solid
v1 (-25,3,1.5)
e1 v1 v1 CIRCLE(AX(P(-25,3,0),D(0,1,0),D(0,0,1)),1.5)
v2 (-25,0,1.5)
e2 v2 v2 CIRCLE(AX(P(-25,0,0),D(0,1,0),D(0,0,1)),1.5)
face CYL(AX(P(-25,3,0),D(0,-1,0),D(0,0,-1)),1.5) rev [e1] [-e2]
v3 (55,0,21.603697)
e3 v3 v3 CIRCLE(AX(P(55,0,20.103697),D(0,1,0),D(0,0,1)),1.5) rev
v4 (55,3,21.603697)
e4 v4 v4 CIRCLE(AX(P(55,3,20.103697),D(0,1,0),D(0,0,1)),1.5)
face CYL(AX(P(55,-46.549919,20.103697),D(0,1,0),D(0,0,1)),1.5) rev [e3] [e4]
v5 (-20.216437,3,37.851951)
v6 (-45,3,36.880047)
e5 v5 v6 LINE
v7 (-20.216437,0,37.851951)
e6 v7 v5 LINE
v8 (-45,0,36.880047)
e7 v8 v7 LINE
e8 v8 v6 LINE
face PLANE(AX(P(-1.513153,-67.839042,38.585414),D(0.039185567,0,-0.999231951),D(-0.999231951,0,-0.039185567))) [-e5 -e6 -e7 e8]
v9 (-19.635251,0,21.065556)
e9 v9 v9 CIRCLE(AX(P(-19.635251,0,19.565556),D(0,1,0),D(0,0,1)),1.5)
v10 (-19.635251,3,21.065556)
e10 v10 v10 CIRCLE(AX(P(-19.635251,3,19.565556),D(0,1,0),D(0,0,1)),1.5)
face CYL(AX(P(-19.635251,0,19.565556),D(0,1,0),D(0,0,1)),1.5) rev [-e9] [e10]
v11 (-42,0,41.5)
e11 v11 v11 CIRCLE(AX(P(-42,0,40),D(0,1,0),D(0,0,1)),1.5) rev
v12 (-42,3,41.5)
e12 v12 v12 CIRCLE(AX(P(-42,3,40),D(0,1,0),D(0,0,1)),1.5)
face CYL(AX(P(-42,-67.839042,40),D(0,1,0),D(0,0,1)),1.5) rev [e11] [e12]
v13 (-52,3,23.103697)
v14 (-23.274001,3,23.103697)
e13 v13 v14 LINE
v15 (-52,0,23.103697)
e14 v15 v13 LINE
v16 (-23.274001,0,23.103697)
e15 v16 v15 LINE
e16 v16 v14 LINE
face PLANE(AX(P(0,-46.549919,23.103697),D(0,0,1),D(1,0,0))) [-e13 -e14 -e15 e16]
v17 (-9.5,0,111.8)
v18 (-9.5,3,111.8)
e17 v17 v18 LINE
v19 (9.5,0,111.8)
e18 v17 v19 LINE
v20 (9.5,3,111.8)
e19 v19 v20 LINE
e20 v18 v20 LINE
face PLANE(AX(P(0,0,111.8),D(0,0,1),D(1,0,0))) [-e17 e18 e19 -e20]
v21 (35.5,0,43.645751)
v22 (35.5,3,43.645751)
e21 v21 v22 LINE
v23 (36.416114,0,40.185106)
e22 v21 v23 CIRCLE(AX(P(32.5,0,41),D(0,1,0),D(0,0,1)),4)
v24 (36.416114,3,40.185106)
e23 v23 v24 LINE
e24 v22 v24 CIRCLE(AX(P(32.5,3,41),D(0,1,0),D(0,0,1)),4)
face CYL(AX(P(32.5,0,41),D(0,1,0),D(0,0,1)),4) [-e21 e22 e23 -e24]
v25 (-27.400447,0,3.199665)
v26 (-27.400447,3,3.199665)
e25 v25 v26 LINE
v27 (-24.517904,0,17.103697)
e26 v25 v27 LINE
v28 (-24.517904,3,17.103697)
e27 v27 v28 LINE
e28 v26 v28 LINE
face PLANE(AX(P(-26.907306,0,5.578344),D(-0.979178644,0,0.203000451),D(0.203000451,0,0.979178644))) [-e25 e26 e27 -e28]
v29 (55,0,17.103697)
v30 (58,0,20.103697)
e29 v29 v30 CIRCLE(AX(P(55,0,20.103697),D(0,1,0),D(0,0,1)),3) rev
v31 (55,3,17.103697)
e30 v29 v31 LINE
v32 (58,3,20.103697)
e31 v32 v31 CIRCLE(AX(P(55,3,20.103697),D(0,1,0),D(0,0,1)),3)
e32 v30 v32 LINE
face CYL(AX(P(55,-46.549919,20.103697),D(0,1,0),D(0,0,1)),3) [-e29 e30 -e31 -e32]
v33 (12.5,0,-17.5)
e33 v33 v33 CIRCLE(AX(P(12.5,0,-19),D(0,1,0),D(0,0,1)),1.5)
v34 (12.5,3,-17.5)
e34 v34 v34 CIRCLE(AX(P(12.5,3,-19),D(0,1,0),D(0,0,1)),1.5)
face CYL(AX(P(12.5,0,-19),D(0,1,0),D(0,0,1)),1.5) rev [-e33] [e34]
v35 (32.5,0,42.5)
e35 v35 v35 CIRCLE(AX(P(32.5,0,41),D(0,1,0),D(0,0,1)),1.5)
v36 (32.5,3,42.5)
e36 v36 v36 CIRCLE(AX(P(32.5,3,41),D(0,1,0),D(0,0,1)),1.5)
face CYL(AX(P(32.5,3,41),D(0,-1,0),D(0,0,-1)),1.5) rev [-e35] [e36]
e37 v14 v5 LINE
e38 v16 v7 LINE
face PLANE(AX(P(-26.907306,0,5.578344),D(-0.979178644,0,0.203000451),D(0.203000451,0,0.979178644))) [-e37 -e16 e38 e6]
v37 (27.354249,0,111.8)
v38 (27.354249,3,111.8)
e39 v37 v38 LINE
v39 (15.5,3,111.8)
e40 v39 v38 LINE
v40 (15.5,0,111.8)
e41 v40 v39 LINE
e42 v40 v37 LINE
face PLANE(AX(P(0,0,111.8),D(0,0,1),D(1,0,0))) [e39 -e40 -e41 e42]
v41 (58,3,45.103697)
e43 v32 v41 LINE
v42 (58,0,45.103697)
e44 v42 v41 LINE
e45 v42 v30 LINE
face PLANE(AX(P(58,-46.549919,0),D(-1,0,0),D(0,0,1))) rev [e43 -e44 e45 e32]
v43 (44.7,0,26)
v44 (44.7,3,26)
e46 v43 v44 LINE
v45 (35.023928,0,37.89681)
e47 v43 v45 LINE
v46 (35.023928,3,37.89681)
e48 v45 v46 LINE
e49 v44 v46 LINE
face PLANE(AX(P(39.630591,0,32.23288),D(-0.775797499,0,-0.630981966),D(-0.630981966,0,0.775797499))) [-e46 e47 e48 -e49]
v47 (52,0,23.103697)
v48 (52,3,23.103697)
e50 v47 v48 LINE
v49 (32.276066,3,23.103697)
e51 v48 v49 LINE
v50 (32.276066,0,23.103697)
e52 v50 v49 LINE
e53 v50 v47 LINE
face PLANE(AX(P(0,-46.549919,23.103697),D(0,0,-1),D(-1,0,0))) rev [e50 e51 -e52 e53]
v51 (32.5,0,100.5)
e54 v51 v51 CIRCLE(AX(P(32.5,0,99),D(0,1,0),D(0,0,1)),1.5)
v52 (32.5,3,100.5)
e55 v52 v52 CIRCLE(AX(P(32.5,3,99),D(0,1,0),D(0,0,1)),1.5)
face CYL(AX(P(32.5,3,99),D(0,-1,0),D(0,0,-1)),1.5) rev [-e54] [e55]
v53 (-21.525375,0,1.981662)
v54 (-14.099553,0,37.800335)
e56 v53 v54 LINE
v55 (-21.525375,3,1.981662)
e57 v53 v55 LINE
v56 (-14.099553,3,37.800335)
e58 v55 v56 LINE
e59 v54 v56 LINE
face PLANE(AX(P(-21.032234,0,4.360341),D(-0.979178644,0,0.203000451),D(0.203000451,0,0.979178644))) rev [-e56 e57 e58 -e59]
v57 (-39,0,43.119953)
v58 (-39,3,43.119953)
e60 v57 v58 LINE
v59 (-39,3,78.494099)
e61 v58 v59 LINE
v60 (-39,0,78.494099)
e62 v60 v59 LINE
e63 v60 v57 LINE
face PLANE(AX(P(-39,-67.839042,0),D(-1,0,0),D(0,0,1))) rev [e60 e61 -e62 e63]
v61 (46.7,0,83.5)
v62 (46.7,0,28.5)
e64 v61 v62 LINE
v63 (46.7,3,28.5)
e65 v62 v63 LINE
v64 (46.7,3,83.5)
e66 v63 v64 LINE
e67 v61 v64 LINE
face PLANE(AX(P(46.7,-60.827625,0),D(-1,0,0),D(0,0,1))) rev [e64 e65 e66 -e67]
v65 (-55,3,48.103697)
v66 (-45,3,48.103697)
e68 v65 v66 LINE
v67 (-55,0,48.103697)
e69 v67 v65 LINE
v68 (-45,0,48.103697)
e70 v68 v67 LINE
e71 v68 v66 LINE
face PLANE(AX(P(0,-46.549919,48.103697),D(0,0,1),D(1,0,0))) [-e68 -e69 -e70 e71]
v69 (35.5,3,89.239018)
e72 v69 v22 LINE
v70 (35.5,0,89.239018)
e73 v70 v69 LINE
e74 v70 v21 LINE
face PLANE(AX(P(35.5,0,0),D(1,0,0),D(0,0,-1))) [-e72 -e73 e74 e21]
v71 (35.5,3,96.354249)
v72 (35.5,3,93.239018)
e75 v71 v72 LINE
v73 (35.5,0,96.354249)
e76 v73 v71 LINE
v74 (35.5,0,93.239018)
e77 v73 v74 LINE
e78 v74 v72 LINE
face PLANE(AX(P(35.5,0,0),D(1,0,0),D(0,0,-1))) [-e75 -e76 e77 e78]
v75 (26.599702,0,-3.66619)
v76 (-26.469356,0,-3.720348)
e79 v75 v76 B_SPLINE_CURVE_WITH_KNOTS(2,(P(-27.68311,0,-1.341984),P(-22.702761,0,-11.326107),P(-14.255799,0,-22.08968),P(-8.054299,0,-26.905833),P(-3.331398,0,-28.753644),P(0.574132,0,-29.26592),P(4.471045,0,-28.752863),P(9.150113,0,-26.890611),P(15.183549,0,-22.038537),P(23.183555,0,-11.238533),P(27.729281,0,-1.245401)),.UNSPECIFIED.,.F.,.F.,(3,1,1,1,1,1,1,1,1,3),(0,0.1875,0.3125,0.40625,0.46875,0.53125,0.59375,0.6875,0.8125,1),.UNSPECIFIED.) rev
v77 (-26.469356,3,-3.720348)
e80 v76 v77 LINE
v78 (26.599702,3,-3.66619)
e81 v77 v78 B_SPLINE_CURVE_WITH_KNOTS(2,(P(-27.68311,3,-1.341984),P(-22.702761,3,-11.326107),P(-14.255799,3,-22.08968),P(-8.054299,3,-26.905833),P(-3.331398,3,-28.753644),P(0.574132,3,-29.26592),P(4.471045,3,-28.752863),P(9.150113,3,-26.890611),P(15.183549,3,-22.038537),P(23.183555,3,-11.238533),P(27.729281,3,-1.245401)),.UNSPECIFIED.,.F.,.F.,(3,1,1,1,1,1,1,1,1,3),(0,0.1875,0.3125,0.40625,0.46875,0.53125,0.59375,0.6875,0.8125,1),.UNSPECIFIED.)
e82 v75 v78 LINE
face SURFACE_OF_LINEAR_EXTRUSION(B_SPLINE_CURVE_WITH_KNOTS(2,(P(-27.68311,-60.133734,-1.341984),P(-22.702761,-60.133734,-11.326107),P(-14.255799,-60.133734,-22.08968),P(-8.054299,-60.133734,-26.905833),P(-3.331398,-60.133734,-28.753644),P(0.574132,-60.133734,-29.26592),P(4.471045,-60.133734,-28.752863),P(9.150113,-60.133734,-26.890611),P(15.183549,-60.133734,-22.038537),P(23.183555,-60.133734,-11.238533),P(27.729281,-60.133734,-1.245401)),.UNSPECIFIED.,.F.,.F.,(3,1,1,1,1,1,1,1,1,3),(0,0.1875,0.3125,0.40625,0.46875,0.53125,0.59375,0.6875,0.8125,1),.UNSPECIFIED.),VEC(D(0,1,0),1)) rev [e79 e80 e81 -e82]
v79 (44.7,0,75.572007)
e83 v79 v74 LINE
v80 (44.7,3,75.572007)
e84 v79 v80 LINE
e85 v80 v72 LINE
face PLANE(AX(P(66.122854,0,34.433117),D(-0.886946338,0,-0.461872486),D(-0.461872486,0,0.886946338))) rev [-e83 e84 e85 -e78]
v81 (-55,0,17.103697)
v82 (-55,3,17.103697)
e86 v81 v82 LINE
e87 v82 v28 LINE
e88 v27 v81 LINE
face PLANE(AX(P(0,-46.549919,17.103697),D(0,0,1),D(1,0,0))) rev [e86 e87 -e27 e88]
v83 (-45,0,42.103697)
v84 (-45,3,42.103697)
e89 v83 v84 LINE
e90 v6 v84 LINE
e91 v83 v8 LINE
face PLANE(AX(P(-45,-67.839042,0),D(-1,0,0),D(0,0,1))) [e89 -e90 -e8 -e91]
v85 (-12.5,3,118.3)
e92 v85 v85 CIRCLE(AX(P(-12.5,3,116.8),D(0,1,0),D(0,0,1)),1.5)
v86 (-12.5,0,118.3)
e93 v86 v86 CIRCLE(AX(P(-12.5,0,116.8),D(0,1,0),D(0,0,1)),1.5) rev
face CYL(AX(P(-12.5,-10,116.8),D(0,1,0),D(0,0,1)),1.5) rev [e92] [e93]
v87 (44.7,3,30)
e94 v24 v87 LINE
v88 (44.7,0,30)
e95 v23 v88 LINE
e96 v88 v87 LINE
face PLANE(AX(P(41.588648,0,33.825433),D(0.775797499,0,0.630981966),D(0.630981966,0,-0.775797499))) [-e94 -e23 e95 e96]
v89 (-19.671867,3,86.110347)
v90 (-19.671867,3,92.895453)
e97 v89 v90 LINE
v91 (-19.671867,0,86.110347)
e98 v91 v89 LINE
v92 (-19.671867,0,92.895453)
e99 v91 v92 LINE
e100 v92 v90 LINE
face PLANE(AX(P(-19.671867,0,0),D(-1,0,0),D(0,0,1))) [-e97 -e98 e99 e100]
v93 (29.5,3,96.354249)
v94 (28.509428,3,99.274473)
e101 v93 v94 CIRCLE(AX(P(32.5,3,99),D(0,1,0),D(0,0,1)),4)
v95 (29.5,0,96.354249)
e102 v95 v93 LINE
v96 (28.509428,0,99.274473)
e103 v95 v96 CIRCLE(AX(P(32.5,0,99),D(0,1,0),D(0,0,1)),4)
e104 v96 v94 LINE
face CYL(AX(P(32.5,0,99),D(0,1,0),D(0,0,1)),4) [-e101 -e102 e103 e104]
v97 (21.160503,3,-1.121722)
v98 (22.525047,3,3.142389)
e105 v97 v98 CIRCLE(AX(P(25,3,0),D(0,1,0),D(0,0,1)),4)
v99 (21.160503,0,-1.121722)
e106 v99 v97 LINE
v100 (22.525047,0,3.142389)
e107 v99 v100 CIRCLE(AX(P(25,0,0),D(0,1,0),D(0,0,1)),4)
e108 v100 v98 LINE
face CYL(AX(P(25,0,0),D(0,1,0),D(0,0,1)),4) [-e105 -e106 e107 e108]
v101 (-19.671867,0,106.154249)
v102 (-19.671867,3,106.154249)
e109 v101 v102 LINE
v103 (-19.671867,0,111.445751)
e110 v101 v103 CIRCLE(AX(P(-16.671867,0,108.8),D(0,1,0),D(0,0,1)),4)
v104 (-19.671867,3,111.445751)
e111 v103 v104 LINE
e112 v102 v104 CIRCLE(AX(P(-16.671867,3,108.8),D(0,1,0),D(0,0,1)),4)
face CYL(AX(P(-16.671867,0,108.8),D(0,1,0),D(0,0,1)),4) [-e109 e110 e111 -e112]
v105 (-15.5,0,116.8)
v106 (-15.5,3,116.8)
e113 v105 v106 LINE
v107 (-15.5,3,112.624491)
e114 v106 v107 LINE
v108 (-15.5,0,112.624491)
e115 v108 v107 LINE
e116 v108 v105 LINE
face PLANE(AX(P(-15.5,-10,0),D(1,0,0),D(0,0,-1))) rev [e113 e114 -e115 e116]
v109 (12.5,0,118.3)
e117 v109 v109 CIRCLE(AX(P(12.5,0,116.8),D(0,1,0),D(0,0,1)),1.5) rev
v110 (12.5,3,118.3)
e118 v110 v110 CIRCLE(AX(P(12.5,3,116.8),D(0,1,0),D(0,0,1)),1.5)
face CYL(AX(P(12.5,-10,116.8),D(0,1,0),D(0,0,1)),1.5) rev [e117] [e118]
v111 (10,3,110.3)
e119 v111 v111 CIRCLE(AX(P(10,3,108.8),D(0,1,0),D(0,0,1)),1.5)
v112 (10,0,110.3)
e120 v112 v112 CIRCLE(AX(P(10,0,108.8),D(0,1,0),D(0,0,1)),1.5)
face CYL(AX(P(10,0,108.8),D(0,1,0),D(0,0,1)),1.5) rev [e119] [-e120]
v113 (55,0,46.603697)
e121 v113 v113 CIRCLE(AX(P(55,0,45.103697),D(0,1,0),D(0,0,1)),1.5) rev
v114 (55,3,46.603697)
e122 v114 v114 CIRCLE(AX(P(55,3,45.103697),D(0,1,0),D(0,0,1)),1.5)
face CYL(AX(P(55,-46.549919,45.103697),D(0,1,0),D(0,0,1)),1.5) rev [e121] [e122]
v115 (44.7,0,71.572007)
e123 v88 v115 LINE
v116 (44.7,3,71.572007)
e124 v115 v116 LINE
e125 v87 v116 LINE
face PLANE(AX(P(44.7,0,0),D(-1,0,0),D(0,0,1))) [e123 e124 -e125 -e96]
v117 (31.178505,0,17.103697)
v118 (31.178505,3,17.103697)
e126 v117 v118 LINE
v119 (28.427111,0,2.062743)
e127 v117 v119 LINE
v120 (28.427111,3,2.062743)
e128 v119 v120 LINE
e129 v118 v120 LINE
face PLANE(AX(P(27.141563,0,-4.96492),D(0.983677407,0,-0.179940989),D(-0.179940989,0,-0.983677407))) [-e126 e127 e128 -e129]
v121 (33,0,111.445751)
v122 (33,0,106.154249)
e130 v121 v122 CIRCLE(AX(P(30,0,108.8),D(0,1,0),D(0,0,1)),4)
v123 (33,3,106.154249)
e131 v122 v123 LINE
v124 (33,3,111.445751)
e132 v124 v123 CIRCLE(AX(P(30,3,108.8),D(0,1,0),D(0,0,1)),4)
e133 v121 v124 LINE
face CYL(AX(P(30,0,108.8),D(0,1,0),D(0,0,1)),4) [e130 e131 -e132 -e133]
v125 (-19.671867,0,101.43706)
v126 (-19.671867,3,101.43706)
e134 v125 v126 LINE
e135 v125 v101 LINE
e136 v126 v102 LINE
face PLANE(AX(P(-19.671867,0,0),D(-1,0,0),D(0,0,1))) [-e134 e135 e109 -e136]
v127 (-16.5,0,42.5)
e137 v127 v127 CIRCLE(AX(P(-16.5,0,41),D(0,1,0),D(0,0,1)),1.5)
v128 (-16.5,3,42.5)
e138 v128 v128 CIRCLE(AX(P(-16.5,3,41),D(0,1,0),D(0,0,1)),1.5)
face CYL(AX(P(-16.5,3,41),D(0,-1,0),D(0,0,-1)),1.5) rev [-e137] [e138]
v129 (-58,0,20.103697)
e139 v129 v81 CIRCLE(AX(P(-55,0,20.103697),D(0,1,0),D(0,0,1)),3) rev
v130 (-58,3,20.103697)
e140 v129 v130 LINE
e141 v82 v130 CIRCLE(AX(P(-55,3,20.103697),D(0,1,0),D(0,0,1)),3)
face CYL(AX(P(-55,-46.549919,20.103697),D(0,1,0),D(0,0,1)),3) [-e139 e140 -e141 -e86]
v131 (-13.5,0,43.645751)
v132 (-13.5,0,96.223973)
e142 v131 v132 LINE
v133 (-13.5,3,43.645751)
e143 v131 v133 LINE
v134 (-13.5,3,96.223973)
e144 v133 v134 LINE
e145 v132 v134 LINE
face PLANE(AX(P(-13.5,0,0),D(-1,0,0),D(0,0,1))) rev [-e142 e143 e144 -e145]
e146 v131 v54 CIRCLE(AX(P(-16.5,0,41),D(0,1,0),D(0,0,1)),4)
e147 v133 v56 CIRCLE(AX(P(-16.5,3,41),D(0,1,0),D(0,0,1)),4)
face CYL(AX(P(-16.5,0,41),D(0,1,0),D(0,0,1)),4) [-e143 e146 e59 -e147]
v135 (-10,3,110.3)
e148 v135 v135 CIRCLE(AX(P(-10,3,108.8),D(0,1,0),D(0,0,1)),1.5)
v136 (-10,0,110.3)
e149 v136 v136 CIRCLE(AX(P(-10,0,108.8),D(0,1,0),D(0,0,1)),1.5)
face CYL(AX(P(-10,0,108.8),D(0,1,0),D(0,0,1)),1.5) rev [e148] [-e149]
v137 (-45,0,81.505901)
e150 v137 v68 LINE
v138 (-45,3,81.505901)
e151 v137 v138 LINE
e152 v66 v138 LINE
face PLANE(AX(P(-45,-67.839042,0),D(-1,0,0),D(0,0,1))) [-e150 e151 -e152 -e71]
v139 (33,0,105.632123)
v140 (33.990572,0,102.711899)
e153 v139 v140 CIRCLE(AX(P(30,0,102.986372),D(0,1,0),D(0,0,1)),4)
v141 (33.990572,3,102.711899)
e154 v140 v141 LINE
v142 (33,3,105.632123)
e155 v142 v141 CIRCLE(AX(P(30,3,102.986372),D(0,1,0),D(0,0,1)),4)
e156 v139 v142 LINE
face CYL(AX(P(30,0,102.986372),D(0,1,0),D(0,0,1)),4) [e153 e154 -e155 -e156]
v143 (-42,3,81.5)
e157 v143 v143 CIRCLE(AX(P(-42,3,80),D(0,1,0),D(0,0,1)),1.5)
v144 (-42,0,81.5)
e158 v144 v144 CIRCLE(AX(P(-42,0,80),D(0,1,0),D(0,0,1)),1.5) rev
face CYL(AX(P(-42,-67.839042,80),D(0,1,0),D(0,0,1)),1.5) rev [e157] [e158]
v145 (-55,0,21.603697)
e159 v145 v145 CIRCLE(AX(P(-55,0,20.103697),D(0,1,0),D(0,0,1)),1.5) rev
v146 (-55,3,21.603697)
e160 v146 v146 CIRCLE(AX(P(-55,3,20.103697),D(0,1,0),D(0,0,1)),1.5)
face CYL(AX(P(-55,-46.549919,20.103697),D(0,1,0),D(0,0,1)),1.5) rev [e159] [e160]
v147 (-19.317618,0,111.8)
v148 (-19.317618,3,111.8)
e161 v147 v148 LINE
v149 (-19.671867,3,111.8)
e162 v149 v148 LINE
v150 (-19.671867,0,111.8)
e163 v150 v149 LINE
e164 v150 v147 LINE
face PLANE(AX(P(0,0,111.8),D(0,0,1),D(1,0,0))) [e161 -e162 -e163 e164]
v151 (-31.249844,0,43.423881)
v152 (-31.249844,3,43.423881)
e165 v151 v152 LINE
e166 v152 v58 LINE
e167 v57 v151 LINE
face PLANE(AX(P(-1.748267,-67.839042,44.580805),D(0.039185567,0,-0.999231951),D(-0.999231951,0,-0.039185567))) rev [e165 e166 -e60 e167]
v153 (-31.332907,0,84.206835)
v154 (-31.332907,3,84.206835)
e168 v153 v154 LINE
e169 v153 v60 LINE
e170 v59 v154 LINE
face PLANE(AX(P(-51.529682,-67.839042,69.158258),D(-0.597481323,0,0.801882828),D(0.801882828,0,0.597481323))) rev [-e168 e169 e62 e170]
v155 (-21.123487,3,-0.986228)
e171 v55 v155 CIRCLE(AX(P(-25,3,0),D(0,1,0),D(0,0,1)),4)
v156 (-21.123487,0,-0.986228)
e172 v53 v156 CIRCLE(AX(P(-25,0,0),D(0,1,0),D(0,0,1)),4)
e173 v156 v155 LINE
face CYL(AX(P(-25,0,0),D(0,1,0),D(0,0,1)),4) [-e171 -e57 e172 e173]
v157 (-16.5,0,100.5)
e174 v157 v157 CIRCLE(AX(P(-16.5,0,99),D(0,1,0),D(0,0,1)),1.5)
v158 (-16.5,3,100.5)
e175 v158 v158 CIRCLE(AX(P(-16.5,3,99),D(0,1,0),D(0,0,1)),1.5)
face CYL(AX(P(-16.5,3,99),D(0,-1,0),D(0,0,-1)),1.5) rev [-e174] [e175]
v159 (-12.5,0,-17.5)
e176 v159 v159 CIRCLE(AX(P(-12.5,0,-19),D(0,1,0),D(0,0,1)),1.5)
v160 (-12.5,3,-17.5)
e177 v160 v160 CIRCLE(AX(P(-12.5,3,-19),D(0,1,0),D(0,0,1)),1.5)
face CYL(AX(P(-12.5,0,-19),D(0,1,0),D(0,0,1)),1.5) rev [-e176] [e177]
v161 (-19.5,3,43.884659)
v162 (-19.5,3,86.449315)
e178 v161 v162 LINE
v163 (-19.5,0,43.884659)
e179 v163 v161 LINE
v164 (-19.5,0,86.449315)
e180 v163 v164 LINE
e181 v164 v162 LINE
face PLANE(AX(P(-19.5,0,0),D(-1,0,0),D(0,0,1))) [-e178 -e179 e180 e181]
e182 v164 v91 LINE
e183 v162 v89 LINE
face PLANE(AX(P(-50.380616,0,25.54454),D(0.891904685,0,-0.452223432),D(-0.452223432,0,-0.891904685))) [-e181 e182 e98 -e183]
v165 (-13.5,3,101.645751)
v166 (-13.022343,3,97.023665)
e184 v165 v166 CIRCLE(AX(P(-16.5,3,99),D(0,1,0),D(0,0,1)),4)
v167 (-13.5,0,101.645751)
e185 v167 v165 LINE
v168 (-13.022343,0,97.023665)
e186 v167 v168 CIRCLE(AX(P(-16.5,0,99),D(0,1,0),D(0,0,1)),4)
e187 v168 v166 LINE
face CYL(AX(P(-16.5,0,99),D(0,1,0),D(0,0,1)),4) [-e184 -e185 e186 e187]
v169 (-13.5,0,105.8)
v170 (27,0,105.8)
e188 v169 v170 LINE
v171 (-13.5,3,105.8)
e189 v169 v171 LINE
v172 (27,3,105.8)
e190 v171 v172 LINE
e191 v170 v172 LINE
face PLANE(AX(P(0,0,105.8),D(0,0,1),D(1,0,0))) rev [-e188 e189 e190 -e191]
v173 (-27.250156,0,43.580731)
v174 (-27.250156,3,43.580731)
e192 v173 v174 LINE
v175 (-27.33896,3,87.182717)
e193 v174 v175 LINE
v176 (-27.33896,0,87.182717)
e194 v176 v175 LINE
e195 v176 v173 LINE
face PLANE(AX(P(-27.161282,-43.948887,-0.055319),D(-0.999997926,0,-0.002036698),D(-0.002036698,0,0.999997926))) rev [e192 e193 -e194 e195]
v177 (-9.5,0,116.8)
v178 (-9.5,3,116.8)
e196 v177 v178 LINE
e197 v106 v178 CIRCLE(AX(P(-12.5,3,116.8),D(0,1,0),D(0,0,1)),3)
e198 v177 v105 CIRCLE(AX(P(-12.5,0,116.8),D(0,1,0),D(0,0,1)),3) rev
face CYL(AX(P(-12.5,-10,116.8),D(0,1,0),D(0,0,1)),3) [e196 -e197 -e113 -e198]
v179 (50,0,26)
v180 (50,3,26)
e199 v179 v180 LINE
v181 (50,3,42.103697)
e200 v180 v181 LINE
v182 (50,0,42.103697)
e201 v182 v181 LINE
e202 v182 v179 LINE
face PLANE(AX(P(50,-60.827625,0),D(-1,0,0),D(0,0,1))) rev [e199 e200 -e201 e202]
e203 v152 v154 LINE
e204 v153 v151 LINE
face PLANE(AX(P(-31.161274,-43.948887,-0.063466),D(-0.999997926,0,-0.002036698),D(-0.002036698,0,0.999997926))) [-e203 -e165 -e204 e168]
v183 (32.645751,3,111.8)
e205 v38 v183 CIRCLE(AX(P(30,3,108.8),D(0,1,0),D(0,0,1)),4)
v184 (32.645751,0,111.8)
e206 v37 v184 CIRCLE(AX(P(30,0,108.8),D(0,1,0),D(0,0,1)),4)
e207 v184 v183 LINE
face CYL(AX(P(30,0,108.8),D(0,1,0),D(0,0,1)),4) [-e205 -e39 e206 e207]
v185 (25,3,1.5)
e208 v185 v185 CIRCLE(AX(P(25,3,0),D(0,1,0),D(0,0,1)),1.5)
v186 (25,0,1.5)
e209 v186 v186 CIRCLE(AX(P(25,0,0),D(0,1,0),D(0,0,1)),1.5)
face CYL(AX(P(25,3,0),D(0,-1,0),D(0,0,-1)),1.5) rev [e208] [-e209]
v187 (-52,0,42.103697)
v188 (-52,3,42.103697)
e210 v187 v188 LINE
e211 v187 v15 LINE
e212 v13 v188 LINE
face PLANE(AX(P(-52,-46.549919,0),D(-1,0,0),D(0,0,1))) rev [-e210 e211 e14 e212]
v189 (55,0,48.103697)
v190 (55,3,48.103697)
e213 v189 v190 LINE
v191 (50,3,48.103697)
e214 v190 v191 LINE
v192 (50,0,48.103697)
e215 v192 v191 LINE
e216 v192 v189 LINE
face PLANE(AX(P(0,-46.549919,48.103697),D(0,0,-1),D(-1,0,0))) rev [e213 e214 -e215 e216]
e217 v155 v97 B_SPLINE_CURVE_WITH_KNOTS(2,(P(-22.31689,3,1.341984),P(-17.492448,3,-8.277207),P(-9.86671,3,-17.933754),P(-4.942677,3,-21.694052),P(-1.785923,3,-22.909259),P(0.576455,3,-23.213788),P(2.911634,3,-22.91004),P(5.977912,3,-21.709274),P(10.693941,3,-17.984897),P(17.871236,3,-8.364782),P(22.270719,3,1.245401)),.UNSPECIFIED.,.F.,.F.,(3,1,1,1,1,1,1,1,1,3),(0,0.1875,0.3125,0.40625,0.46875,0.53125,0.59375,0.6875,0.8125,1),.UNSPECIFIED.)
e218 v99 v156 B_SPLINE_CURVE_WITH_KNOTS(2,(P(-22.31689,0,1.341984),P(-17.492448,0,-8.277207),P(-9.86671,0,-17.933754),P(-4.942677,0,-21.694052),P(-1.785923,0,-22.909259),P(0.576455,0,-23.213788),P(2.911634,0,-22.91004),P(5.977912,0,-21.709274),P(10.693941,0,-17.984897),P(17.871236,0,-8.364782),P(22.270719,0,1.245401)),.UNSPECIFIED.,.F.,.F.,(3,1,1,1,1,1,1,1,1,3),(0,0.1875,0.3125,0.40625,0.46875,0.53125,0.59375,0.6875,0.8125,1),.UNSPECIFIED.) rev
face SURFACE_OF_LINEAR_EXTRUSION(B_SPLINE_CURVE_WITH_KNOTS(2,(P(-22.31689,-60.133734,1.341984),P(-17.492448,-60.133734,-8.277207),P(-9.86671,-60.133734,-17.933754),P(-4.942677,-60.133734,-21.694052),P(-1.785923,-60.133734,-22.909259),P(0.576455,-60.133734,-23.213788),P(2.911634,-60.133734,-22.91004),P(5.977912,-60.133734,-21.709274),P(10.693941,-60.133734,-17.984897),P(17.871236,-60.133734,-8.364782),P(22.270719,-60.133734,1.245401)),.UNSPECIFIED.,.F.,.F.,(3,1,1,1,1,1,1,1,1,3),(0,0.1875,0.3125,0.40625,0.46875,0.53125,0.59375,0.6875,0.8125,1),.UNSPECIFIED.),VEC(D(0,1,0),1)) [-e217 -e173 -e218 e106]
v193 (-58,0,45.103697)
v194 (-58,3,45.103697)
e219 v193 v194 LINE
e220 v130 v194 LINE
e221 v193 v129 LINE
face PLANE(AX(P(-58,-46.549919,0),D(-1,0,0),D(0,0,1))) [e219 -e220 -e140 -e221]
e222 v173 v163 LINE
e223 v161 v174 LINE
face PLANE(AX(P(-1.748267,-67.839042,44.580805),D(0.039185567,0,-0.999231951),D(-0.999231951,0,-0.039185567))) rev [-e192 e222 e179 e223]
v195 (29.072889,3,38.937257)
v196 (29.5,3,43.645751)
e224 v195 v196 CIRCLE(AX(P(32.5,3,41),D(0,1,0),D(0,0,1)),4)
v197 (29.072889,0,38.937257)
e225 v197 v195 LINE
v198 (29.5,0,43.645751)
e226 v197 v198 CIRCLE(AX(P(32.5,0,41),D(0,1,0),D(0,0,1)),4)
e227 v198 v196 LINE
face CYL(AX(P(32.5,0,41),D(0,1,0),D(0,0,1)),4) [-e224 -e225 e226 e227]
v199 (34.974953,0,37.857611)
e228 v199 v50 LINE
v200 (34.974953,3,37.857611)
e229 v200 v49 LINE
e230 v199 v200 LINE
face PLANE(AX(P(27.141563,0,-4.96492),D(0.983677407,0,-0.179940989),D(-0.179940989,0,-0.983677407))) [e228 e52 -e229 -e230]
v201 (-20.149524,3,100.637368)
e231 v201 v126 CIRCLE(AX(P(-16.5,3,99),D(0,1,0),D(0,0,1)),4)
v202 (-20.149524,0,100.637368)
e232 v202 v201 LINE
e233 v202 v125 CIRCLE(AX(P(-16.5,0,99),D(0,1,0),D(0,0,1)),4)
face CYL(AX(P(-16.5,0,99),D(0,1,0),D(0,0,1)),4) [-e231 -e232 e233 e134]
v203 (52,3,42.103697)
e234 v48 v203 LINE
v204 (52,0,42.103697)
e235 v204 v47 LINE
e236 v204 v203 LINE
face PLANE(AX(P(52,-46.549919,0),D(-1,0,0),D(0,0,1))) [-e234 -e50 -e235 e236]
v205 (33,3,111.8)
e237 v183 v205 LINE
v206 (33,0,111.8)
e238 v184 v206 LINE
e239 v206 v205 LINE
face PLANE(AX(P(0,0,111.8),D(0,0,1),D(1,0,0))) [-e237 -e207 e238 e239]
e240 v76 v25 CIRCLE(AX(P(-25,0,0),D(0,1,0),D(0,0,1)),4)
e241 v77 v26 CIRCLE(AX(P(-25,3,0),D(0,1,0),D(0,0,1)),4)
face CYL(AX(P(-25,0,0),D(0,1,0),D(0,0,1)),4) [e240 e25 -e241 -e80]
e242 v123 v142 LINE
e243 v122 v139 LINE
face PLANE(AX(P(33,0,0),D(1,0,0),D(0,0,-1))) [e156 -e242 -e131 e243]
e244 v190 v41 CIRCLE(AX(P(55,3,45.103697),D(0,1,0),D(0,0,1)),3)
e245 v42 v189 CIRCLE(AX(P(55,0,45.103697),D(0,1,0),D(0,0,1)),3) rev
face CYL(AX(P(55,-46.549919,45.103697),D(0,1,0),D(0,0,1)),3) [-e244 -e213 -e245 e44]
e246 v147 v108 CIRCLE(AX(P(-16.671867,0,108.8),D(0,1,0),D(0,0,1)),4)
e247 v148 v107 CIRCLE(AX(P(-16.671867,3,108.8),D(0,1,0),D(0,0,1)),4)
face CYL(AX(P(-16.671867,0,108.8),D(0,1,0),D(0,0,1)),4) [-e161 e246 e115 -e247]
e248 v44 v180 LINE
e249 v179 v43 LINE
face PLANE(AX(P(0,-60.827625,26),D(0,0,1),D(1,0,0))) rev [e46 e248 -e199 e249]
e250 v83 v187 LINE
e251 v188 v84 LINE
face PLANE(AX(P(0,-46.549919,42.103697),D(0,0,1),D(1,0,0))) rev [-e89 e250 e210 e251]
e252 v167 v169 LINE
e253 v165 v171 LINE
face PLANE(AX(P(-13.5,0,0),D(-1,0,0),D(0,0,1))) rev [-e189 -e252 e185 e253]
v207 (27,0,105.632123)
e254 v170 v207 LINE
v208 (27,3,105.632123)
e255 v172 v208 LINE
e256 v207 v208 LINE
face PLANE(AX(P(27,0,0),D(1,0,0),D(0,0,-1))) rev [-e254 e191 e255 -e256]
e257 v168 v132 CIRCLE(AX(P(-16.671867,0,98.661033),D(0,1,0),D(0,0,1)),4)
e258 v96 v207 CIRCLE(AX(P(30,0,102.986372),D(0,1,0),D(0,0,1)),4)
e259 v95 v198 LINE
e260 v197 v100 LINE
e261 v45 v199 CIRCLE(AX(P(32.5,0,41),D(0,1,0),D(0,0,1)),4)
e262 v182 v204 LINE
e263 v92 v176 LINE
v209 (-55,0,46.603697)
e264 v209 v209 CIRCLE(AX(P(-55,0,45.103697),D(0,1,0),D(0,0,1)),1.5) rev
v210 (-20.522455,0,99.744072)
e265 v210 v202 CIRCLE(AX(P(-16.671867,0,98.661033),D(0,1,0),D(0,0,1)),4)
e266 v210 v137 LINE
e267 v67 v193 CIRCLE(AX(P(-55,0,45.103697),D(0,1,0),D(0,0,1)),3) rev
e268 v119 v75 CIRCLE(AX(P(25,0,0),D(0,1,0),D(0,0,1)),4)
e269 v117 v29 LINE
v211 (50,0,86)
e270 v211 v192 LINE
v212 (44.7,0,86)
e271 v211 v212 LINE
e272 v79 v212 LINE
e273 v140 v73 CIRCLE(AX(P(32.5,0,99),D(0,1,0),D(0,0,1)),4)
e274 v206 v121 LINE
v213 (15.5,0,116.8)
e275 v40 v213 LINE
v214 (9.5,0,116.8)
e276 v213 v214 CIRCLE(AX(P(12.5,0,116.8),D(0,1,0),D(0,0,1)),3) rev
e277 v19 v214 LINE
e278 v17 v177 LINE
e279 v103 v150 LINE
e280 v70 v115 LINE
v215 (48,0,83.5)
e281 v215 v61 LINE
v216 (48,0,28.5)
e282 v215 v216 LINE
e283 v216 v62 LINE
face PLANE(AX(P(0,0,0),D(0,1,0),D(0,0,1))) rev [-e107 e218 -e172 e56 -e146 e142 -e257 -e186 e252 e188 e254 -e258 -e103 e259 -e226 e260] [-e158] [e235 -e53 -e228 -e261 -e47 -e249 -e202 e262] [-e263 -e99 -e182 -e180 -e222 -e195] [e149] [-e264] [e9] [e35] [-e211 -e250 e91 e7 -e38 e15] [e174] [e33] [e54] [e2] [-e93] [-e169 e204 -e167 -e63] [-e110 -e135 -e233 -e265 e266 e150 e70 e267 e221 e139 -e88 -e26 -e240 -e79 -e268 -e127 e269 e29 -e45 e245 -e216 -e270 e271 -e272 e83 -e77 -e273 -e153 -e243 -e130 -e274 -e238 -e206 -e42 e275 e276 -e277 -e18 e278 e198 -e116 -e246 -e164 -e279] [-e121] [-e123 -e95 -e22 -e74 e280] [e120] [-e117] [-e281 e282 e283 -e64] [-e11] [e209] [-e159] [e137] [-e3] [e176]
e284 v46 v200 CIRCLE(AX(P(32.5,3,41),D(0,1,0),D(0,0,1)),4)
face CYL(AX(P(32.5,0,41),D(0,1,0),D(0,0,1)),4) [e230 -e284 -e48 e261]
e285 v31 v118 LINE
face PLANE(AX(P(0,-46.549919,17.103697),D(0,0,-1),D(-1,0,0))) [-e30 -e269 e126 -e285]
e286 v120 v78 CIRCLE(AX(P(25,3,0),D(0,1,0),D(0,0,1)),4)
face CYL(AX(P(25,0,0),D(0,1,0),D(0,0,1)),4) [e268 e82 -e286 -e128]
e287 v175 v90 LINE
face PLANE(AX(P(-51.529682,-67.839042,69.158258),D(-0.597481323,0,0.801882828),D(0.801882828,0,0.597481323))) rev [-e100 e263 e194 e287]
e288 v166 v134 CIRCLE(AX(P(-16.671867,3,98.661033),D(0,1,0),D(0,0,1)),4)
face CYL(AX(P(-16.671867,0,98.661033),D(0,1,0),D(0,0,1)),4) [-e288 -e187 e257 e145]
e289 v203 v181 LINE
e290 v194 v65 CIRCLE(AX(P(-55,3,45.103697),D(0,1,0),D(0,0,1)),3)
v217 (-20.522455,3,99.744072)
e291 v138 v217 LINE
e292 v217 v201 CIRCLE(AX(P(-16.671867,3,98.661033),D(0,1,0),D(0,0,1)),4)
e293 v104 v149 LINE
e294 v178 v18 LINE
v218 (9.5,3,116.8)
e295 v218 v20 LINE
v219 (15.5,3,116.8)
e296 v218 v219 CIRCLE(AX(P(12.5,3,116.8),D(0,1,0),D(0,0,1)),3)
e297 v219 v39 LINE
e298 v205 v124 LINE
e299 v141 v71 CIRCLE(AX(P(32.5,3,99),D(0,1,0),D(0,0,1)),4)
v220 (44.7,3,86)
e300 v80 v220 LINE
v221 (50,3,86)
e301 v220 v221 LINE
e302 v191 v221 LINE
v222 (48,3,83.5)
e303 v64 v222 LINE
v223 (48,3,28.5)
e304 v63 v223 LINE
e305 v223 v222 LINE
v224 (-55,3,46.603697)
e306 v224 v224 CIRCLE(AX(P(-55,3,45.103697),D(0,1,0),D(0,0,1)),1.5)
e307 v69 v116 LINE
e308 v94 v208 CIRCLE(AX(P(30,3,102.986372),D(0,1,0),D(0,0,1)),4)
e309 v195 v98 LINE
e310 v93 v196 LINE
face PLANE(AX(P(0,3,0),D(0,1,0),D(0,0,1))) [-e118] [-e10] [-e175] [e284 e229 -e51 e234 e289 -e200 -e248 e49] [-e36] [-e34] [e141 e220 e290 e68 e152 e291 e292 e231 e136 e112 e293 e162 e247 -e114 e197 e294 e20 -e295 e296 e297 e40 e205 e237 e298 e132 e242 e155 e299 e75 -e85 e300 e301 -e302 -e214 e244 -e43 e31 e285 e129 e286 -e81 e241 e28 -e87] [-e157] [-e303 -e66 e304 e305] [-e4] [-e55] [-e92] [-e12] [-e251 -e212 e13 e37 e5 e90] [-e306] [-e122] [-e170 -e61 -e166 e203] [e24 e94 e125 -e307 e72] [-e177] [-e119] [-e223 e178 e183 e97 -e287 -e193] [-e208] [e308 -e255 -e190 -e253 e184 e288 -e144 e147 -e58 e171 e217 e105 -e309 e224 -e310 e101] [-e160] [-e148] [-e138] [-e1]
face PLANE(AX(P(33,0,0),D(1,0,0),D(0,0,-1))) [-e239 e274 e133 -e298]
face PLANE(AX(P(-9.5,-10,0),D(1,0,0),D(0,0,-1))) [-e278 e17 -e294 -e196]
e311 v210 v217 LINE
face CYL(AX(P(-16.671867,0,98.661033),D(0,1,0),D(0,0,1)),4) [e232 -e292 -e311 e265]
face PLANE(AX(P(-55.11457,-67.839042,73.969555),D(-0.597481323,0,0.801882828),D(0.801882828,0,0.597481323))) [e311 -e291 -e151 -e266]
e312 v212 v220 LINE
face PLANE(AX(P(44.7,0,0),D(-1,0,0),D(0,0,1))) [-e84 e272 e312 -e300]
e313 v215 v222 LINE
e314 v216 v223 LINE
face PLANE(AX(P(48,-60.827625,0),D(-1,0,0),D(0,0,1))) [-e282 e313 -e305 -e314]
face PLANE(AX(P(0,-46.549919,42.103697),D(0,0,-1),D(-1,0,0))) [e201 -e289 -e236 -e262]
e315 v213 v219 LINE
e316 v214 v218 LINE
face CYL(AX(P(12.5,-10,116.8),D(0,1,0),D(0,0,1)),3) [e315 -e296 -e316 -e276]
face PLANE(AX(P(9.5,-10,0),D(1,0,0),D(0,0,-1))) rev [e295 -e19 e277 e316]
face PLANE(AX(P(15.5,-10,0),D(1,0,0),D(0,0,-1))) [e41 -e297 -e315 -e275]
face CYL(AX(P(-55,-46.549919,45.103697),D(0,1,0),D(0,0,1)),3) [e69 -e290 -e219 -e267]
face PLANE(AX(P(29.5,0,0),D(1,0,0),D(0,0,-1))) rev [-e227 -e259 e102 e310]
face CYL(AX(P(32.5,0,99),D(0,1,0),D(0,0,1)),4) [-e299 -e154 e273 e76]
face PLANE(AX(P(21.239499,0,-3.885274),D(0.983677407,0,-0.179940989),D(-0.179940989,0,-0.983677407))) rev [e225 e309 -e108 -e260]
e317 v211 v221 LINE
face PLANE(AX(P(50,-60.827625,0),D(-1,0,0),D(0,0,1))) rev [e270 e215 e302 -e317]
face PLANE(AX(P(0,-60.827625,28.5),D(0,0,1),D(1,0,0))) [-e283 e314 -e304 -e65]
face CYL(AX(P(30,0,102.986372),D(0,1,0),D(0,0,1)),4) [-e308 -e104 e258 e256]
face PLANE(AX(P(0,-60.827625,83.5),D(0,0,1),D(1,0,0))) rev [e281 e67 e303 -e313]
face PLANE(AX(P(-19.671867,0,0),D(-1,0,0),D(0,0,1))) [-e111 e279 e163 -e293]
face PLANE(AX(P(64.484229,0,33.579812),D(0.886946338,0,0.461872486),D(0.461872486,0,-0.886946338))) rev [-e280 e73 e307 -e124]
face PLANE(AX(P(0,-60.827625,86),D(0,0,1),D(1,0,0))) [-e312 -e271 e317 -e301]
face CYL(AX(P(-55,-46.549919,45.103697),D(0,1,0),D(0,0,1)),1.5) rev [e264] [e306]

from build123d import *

# Parameters (mm, degrees)
SKETCH_1_W           = 80
SKETCH_1_H           = 120
SKETCH_1_R           = 1.5
EXTRUDE_1_DEPTH      = 3
SKETCH_2_W           = 10
SKETCH_2_H           = 60
SKETCH_2_W_2         = 1.3
SKETCH_2_H_2         = 55
EXTRUDE_2_DEPTH      = 3
CUT_EXTRUDE_1_DEPTH  = 126.435242257
EXTRUDE_4_DEPTH      = 3
SKETCH_23_R          = 1.5
EXTRUDE_9_DEPTH      = 3
SKETCH_25_R          = 1.5
CUT_EXTRUDE_8_DEPTH  = 124.421392121
SKETCH_26_R          = 1.5
CUT_EXTRUDE_9_DEPTH  = 124.421392121
EXTRUDE_10_DEPTH     = 3
SKETCH_28_R          = 1.5
CUT_EXTRUDE_10_DEPTH = 124.421392121
SKETCH_29_R          = 1.5
EXTRUDE_11_DEPTH     = 3
SKETCH_30_R          = 3
SKETCH_30_R_2        = 1.5
EXTRUDE_12_DEPTH     = 3


with BuildPart() as part:
    # 草图1 → 凸台-拉伸1 (new body)
    # profile 1 of 5: a face of its own
    with BuildSketch(Plane(origin=(0, 0, 0), x_dir=(1, 0, 0), z_dir=(0, 1, 0))):
        with Locations((0, -55)):
            Rectangle(SKETCH_1_W, SKETCH_1_H)
        with Locations(Location((32.5, -99, 0), (0, 0, 270))):
            Circle(SKETCH_1_R, mode=Mode.SUBTRACT)
        with Locations(Location((32.5, -41, 0), (0, 0, 270))):
            Circle(SKETCH_1_R, mode=Mode.SUBTRACT)
        with Locations(Location((-16.5, -99, 0), (0, 0, 270))):
            Circle(SKETCH_1_R, mode=Mode.SUBTRACT)
        with Locations(Location((-16.5, -41, 0), (0, 0, 270))):
            Circle(SKETCH_1_R, mode=Mode.SUBTRACT)
        with Locations((30, -91.2)):
            Circle(SKETCH_1_R, mode=Mode.SUBTRACT)
        with Locations((30, -108.8)):
            Circle(SKETCH_1_R, mode=Mode.SUBTRACT)
        with Locations((-30, -108.8)):
            Circle(SKETCH_1_R, mode=Mode.SUBTRACT)
        with Locations((-30, -91.2)):
            Circle(SKETCH_1_R, mode=Mode.SUBTRACT)
        with Locations(Location((25, 0, 0), (0, 0, 270))):
            Circle(SKETCH_1_R, mode=Mode.SUBTRACT)
        with Locations(Location((-25, 0, 0), (0, 0, 270))):
            Circle(SKETCH_1_R, mode=Mode.SUBTRACT)
    # profile 2 of 5: a face of its own
    with BuildSketch(Plane(origin=(0, 0, 0), x_dir=(1, 0, 0), z_dir=(0, 1, 0))):
        with Locations((-30, -108.8)):
            Circle(SKETCH_1_R)
    # profile 3 of 5: a face of its own
    with BuildSketch(Plane(origin=(0, 0, 0), x_dir=(1, 0, 0), z_dir=(0, 1, 0))):
        with Locations((-30, -91.2)):
            Circle(SKETCH_1_R)
    # profile 4 of 5: a face of its own
    with BuildSketch(Plane(origin=(0, 0, 0), x_dir=(1, 0, 0), z_dir=(0, 1, 0))):
        with Locations((30, -91.2)):
            Circle(SKETCH_1_R)
    # profile 5 of 5: a face of its own
    with BuildSketch(Plane(origin=(0, 0, 0), x_dir=(1, 0, 0), z_dir=(0, 1, 0))):
        with Locations((30, -108.8)):
            Circle(SKETCH_1_R)
    extrude(amount=EXTRUDE_1_DEPTH)

    # 草图2 → 凸台-拉伸2 (add)
    with BuildSketch(Plane(origin=(0, 3, 0), x_dir=(1, 0, 0), z_dir=(0, 1, 0))):
        with Locations((45, -56)):
            Rectangle(SKETCH_2_W, SKETCH_2_H)
        with Locations((47.35, -56)):
            Rectangle(SKETCH_2_W_2, SKETCH_2_H_2, mode=Mode.SUBTRACT)
    extrude(amount=-EXTRUDE_2_DEPTH)

    # 草图6 → 切除-拉伸1 (cut, through all)
    with BuildSketch(Plane(origin=(0, 3, 0), x_dir=(1, 0, 0), z_dir=(0, 1, 0))):
        with BuildLine():
            Line((-19.974624641, -39.01833817), (-27.400447224, -3.199664533))
            ThreePointArc((-27.400447224, -3.199664533), (-25.812001802, 3.916714576), (-21.525375359, -1.98166183))
            Line((-21.525375359, -1.98166183), (-14.099552776, -37.800335467))
            ThreePointArc((-14.099552776, -37.800335467), (-12.520875831, -40.591869081), (-13.5, -43.645751311))
            Line((-13.5, -43.645751311), (-13.5, -96.223972971))
            ThreePointArc((-13.5, -96.223972971), (-13.237813818, -96.609867416), (-13.022342803, -97.023664901))
            ThreePointArc((-13.022342803, -97.023664901), (-12.521189702, -99.411179542), (-13.5, -101.645751311))
            Line((-13.5, -101.645751311), (-13.5, -105.8))
            Line((-13.5, -105.8), (27, -105.8))
            Line((27, -105.8), (27, -105.632123229))
            ThreePointArc((27, -105.632123229), (26.108183077, -102.062380016), (28.509428025, -99.274472783))
            ThreePointArc((28.509428025, -99.274472783), (28.711999033, -97.715068611), (29.5, -96.354248689))
            Line((29.5, -96.354248689), (29.5, -43.645751311))
            ThreePointArc((29.5, -43.645751311), (28.516356033, -41.36135958), (29.072888672, -38.937257179))
            Line((29.072888672, -38.937257179), (22.525046888, -3.142388756))
            ThreePointArc((22.525046888, -3.142388756), (24.280236044, 3.934709627), (28.427111328, -2.062742821))
            Line((28.427111328, -2.062742821), (34.974953112, -37.857611244))
            ThreePointArc((34.974953112, -37.857611244), (34.999517331, -37.877114617), (35.023927863, -37.896810005))
            Line((35.023927863, -37.896810005), (44.7, -26))
            Line((44.7, -26), (40, -26))
            Line((40, -26), (40, 5))
            Line((40, 5), (-40, 5))
            Line((-40, 5), (-40, -115))
            Line((-40, -115), (40, -115))
            Line((40, -115), (40, -86))
            Line((40, -86), (44.7, -86))
            Line((44.7, -86), (44.7, -75.572007087))
            Line((44.7, -75.572007087), (35.5, -93.239018136))
            Line((35.5, -93.239018136), (35.5, -96.354248689))
            ThreePointArc((35.5, -96.354248689), (36.391816923, -99.923991902), (33.990571975, -102.711899135))
            ThreePointArc((33.990571975, -102.711899135), (33.788000967, -104.271303307), (33, -105.632123229))
            Line((33, -105.632123229), (33, -106.154248689))
            ThreePointArc((33, -106.154248689), (34, -108.8), (33, -111.445751311))
            Line((33, -111.445751311), (33, -111.8))
            Line((33, -111.8), (32.645751311, -111.8))
            ThreePointArc((32.645751311, -111.8), (30, -112.8), (27.354248689, -111.8))
            Line((27.354248689, -111.8), (-14.026115719, -111.8))
            ThreePointArc((-14.026115719, -111.8), (-16.67186703, -112.8), (-19.317618341, -111.8))
            Line((-19.317618341, -111.8), (-19.67186703, -111.8))
            Line((-19.67186703, -111.8), (-19.67186703, -111.445751311))
            ThreePointArc((-19.67186703, -111.445751311), (-20.67186703, -108.8), (-19.67186703, -106.154248689))
            Line((-19.67186703, -106.154248689), (-19.67186703, -101.437059611))
            ThreePointArc((-19.67186703, -101.437059611), (-19.934053212, -101.051165166), (-20.149524226, -100.63736768))
            ThreePointArc((-20.149524226, -100.63736768), (-20.650677327, -98.24985304), (-19.67186703, -96.015281271))
            Line((-19.67186703, -96.015281271), (-19.67186703, -86.110347101))
            Line((-19.67186703, -86.110347101), (-19.5, -86.44931452))
            Line((-19.5, -86.44931452), (-19.5, -43.645751311))
            ThreePointArc((-19.5, -43.645751311), (-20.479124169, -41.408130919), (-19.974624641, -39.01833817))
        make_face()
        with BuildLine():
            Line((35.5, -43.645751311), (35.5, -89.239018136))
            Line((35.5, -89.239018136), (44.7, -71.572007087))
            Line((44.7, -71.572007087), (44.7, -30))
            Line((44.7, -30), (36.416113845, -40.185105928))
            ThreePointArc((36.416113845, -40.185105928), (36.366804145, -42.023633578), (35.5, -43.645751311))
        make_face()
    extrude(amount=-CUT_EXTRUDE_1_DEPTH, mode=Mode.SUBTRACT)

    # 草图8 → 凸台-拉伸4 (add)
    with BuildSketch(Plane(origin=(0, 3, 0), x_dir=(1, 0, 0), z_dir=(0, 1, 0))):
        with BuildLine():
            ThreePointArc((-26.469356148, 3.720348439), (-23.178611726, 3.561256065), (-21.123486777, 0.986227779))
            add(Edge.make_bspline(
                [(-21.123486777, 0.986227779), (-16.924725692, 8.996120097), (-9.86671034, 17.933754479), (-4.942677087, 21.694051676), (-1.785923347, 22.90925881), (0.57645486, 23.213787767), (2.911633949, 22.91003978), (5.977911566, 21.709273569), (10.693941251, 17.98489718), (17.327148514, 9.094052388), (21.160502683, 1.121722049)],
                knots=[0.023265065, 0.023265065, 0.023265065, 0.1875, 0.3125, 0.40625, 0.46875, 0.53125, 0.59375, 0.6875, 0.8125, 0.976310374, 0.976310374, 0.976310374], degree=2))
            ThreePointArc((21.160502683, 1.121722049), (23.305081101, 3.623154693), (26.599702444, 3.666190406))
            add(Edge.make_bspline(
                [(-26.469356148, 3.720348439), (-22.085843634, 12.112216128), (-14.255799236, 22.08968003), (-8.054298827, 26.905833085), (-3.331397688, 28.753643899), (0.574132073, 29.265919727), (4.471045016, 28.752862928), (9.150112519, 26.890611193), (15.183549173, 22.038537329), (22.589230715, 12.040870083), (26.599702444, 3.666190406)],
                knots=[0.022823183, 0.022823183, 0.022823183, 0.1875, 0.3125, 0.40625, 0.46875, 0.53125, 0.59375, 0.6875, 0.8125, 0.976784227, 0.976784227, 0.976784227], degree=2))
        make_face()
    extrude(amount=-EXTRUDE_4_DEPTH)

    # 草图23 → 凸台-拉伸9 (add)
    with BuildSketch(Plane(origin=(0, 3, 0), x_dir=(1, 0, 0), z_dir=(0, 1, 0))):
        with BuildLine():
            Line((-19.974624641, -39.01833817), (-20.216436517, -37.851951473))
            Line((-20.216436517, -37.851951473), (-45, -36.880047022))
            Line((-45, -36.880047022), (-45, -81.505900851))
            Line((-45, -81.505900851), (-20.522454785, -99.744071795))
            ThreePointArc((-20.522454785, -99.744071795), (-20.571688544, -97.771430335), (-19.67186703, -96.015281271))
            Line((-19.67186703, -96.015281271), (-19.67186703, -92.895453127))
            Line((-19.67186703, -92.895453127), (-39, -78.494099149))
            Line((-39, -78.494099149), (-39, -43.119952978))
            Line((-39, -43.119952978), (-19.5, -43.88465886))
            Line((-19.5, -43.88465886), (-19.5, -43.645751311))
            ThreePointArc((-19.5, -43.645751311), (-20.479124169, -41.408130919), (-19.974624641, -39.01833817))
        make_face()
        with Locations(Location((-42, -80, 0), (0, 0, 270))):
            Circle(SKETCH_23_R, mode=Mode.SUBTRACT)
        with Locations(Location((-42, -40, 0), (0, 0, 270))):
            Circle(SKETCH_23_R, mode=Mode.SUBTRACT)
    extrude(amount=-EXTRUDE_9_DEPTH)

    # 草图25 → 切除-拉伸8 (cut, through all)
    with BuildSketch(Plane(origin=(0, 3, 0), x_dir=(1, 0, 0), z_dir=(0, 1, 0))):
        with Locations(Location((-10, -108.8, 0), (0, 0, 270))):
            Circle(SKETCH_25_R)
        with Locations(Location((10, -108.8, 0), (0, 0, 270))):
            Circle(SKETCH_25_R)
    extrude(amount=-CUT_EXTRUDE_8_DEPTH, mode=Mode.SUBTRACT)

    # 草图26 → 切除-拉伸9 (cut, through all)
    with BuildSketch(Plane(origin=(0, 3, 0), x_dir=(1, 0, 0), z_dir=(0, 1, 0))):
        with Locations(Location((-19.635250756, -19.565556065, 0), (0, 0, 270))):
            Circle(SKETCH_26_R)
    extrude(amount=-CUT_EXTRUDE_9_DEPTH, mode=Mode.SUBTRACT)

    # 草图27 → 凸台-拉伸10 (add)
    with BuildSketch(Plane(origin=(0, 3, 0), x_dir=(1, 0, 0), z_dir=(0, 1, 0))):
        Polygon((-27.250155581, -43.58073119), (-31.249844419, -43.423880648), (-31.332907169, -84.206834984), (-27.33895986, -87.182717292), align=None)
    extrude(amount=-EXTRUDE_10_DEPTH)

    # 草图28 → 切除-拉伸10 (cut, through all)
    with BuildSketch(Plane(origin=(0, 3, 0), x_dir=(1, 0, 0), z_dir=(0, 1, 0))):
        with Locations(Location((-12.5, 19, 0), (0, 0, 270))):
            Circle(SKETCH_28_R)
        with Locations(Location((12.5, 19, 0), (0, 0, 270))):
            Circle(SKETCH_28_R)
    extrude(amount=-CUT_EXTRUDE_10_DEPTH, mode=Mode.SUBTRACT)

    # 草图29 → 凸台-拉伸11 (add)
    # profile 1 of 2: a face of its own
    with BuildSketch(Plane(origin=(0, 3, 0), x_dir=(1, 0, 0), z_dir=(0, 1, 0))):
        with BuildLine():
            Line((-45, -48.10369719), (-45, -42.10369719))
            Line((-45, -42.10369719), (-52, -42.10369719))
            Line((-52, -42.10369719), (-52, -23.10369719))
            Line((-52, -23.10369719), (-23.274001429, -23.10369719))
            Line((-23.274001429, -23.10369719), (-24.517903868, -17.10369719))
            Line((-24.517903868, -17.10369719), (-55, -17.10369719))
            ThreePointArc((-55, -17.10369719), (-57.121320344, -17.982376846), (-58, -20.10369719))
            Line((-58, -20.10369719), (-58, -45.10369719))
            ThreePointArc((-58, -45.10369719), (-57.121320344, -47.225017534), (-55, -48.10369719))
            Line((-55, -48.10369719), (-45, -48.10369719))
        make_face()
        with Locations(Location((-55, -45.10369719, 0), (0, 0, 270))):
            Circle(SKETCH_29_R, mode=Mode.SUBTRACT)
        with Locations(Location((-55, -20.10369719, 0), (0, 0, 270))):
            Circle(SKETCH_29_R, mode=Mode.SUBTRACT)
    # profile 2 of 2: a face of its own
    with BuildSketch(Plane(origin=(0, 3, 0), x_dir=(1, 0, 0), z_dir=(0, 1, 0))):
        with BuildLine():
            Line((52, -42.10369719), (50, -42.10369719))
            Line((50, -42.10369719), (50, -48.10369719))
            Line((50, -48.10369719), (55, -48.10369719))
            ThreePointArc((55, -48.10369719), (57.121320344, -47.225017534), (58, -45.10369719))
            Line((58, -45.10369719), (58, -20.10369719))
            ThreePointArc((58, -20.10369719), (57.121320344, -17.982376846), (55, -17.10369719))
            Line((55, -17.10369719), (31.17850542, -17.10369719))
            Line((31.17850542, -17.10369719), (32.276066395, -23.10369719))
            Line((32.276066395, -23.10369719), (52, -23.10369719))
            Line((52, -23.10369719), (52, -42.10369719))
        make_face()
        with Locations(Location((55, -45.10369719, 0), (0, 0, 270))):
            Circle(SKETCH_29_R, mode=Mode.SUBTRACT)
        with Locations(Location((55, -20.10369719, 0), (0, 0, 270))):
            Circle(SKETCH_29_R, mode=Mode.SUBTRACT)
    extrude(amount=-EXTRUDE_11_DEPTH)

    # 草图30 → 凸台-拉伸12 (add)
    # profile 1 of 4: a face of its own
    with BuildSketch(Plane(origin=(0, 3, 0), x_dir=(1, 0, 0), z_dir=(0, 1, 0))):
        with BuildLine():
            ThreePointArc((-15.5, -116.8), (-12.5, -113.8), (-9.5, -116.8))
            Line((-9.5, -116.8), (-9.5, -111.8))
            Line((-9.5, -111.8), (-14.026115719, -111.8))
            ThreePointArc((-14.026115719, -111.8), (-14.719048912, -112.290916986), (-15.5, -112.62449051))
            Line((-15.5, -112.62449051), (-15.5, -116.8))
        make_face()
    # profile 2 of 4: a face of its own
    with BuildSketch(Plane(origin=(0, 3, 0), x_dir=(1, 0, 0), z_dir=(0, 1, 0))):
        with Locations((-12.5, -116.8)):
            Circle(SKETCH_30_R)
        with Locations(Location((-12.5, -116.8, 0), (0, 0, 270))):
            Circle(SKETCH_30_R_2, mode=Mode.SUBTRACT)
    # profile 3 of 4: a face of its own
    with BuildSketch(Plane(origin=(0, 3, 0), x_dir=(1, 0, 0), z_dir=(0, 1, 0))):
        with BuildLine():
            Line((15.5, -111.8), (9.5, -111.8))
            Line((9.5, -111.8), (9.5, -116.8))
            ThreePointArc((9.5, -116.8), (12.5, -113.8), (15.5, -116.8))
            Line((15.5, -116.8), (15.5, -111.8))
        make_face()
    # profile 4 of 4: a face of its own
    with BuildSketch(Plane(origin=(0, 3, 0), x_dir=(1, 0, 0), z_dir=(0, 1, 0))):
        with Locations((12.5, -116.8)):
            Circle(SKETCH_30_R)
        with Locations(Location((12.5, -116.8, 0), (0, 0, 270))):
            Circle(SKETCH_30_R_2, mode=Mode.SUBTRACT)
    extrude(amount=-EXTRUDE_12_DEPTH)


solid = part.part
